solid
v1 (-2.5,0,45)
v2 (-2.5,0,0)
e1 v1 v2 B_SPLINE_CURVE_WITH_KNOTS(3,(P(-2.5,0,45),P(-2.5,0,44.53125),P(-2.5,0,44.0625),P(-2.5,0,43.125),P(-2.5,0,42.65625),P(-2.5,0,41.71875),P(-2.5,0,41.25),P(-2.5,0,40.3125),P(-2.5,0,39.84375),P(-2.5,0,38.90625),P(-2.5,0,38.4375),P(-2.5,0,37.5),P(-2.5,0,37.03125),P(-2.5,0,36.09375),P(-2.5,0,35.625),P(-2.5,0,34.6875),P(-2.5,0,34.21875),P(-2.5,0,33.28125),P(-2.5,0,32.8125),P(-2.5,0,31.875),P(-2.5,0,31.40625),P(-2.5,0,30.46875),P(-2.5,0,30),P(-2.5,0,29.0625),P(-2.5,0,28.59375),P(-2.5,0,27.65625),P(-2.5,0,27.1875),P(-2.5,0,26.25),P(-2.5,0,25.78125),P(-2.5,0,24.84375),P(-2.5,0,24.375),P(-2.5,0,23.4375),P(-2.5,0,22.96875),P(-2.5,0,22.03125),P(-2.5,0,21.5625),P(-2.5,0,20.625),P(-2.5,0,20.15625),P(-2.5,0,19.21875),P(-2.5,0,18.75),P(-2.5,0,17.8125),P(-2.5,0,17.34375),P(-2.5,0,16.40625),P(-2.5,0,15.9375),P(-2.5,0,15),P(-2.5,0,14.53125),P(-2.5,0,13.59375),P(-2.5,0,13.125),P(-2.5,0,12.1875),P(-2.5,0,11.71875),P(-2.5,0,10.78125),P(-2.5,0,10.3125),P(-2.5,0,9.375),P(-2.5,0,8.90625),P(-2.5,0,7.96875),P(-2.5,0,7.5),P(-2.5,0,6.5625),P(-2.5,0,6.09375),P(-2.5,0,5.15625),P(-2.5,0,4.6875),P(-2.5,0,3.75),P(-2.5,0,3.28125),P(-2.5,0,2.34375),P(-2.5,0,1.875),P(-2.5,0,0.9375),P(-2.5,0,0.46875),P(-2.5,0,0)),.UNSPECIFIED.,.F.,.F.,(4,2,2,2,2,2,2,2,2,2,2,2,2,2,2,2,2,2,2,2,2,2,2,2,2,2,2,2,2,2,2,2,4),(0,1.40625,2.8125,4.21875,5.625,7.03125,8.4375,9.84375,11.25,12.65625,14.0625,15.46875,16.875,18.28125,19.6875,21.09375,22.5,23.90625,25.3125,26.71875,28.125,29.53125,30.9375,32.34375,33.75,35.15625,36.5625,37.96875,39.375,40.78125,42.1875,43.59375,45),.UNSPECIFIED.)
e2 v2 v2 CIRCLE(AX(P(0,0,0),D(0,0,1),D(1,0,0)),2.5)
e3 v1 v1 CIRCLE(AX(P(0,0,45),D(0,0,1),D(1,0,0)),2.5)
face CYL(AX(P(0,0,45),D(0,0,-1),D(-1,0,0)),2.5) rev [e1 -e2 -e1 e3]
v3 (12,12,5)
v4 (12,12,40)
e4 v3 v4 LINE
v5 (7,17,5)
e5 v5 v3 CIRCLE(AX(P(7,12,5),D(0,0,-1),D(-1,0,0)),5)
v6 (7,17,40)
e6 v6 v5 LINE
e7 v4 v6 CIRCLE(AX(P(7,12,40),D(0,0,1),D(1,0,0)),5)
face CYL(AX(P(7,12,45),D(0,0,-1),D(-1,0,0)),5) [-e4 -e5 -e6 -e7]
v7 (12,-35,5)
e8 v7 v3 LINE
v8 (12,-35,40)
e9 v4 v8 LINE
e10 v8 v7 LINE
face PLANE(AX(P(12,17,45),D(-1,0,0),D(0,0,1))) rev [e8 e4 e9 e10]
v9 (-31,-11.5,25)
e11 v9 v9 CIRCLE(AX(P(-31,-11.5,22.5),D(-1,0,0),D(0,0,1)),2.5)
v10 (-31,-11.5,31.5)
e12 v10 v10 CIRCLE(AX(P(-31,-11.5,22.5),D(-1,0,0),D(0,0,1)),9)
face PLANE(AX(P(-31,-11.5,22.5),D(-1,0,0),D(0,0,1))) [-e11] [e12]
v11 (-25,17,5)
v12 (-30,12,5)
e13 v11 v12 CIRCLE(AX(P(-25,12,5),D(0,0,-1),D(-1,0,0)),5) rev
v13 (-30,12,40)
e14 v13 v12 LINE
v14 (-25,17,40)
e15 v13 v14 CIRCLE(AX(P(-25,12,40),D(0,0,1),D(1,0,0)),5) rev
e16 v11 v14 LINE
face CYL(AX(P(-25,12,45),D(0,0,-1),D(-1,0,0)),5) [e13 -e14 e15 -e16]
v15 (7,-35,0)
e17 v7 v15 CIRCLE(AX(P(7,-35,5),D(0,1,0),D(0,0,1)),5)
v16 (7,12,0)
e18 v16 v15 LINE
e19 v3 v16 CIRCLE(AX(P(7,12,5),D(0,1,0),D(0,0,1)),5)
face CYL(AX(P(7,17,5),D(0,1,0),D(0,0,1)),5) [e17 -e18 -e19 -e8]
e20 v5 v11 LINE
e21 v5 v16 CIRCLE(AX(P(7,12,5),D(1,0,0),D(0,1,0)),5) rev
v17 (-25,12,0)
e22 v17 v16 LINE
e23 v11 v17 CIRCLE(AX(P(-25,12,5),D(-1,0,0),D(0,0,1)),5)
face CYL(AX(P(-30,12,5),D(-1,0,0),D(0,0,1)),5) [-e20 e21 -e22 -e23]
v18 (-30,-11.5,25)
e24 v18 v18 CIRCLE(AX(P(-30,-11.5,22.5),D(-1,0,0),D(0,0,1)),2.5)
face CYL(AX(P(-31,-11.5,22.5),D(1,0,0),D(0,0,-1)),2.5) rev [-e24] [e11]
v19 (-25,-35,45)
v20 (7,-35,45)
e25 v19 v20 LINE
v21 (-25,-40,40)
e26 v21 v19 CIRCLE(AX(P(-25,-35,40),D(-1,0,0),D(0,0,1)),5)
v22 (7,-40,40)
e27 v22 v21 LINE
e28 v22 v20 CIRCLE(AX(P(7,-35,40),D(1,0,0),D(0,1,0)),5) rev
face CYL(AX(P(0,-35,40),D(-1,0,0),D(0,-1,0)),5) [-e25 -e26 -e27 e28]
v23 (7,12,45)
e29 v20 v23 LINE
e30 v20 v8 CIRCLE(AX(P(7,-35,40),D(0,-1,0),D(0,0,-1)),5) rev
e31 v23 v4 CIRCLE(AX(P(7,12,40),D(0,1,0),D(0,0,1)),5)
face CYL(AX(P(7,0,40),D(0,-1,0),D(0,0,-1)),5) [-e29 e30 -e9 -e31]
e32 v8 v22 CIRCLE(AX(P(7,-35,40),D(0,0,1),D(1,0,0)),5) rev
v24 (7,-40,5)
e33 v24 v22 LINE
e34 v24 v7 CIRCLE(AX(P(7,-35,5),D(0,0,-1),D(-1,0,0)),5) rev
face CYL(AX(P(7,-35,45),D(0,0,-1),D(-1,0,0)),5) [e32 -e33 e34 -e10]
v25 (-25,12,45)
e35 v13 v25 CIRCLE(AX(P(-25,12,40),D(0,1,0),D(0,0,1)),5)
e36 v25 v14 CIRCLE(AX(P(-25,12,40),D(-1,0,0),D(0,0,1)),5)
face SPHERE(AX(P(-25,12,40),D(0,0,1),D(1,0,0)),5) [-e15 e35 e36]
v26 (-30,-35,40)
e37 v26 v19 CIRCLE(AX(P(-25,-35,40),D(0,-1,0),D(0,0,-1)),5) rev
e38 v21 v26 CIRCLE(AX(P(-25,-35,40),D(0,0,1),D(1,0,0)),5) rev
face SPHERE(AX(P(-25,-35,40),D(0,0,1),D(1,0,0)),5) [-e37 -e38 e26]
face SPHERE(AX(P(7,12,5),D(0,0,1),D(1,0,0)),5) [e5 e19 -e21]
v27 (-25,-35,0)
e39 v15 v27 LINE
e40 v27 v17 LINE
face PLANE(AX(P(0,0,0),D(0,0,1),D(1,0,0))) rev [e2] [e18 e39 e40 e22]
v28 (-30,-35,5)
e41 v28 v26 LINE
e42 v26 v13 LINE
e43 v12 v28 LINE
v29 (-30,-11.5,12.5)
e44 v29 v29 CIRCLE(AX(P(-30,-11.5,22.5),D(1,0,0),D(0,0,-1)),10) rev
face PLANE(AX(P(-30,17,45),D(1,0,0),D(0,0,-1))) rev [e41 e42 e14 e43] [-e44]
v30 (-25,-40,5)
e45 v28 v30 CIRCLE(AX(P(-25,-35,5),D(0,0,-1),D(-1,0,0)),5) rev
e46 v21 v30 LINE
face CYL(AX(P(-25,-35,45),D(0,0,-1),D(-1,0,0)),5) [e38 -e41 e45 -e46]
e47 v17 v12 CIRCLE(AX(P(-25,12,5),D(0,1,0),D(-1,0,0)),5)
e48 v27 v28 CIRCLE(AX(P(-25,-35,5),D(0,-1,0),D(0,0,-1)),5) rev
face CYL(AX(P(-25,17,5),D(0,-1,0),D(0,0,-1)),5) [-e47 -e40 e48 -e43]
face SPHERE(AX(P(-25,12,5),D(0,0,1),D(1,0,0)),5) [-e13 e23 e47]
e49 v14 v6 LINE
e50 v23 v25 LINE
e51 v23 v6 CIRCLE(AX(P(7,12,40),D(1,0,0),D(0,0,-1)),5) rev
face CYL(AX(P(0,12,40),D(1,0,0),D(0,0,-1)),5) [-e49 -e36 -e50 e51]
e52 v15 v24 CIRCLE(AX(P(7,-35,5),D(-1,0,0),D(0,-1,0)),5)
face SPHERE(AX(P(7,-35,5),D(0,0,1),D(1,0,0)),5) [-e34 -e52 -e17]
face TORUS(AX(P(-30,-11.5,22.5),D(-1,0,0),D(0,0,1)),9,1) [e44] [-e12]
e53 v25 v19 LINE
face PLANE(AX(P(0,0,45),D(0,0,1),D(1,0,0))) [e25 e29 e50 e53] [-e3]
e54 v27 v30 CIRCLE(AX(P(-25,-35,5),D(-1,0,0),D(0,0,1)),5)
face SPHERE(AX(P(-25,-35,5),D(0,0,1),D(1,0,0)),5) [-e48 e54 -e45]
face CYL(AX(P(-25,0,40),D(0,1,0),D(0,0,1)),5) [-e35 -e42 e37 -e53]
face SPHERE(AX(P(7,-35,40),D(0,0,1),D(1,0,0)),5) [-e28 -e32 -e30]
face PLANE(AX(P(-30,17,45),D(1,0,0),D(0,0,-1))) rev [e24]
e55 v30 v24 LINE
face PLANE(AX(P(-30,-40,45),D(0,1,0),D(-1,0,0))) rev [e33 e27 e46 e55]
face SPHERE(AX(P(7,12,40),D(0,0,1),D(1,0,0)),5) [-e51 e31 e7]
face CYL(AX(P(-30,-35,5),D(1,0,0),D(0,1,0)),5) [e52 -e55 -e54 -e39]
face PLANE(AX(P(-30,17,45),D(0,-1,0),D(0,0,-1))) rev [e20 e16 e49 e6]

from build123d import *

# Parameters (mm, degrees)
SKETCH1_W           = 42
SKETCH1_H           = 57
SKETCH1_R           = 2.5
BOSS_EXTRUDE1_DEPTH = 45
FILLET1_R           = 5
FILLET2_R           = 5
SKETCH2_R           = 10
SKETCH2_R_2         = 2.5
BOSS_EXTRUDE2_DEPTH = 1
FILLET3_R           = 1


# Some blends are built 0.0001 mm under size
with BuildPart() as part:
    # Sketch1 → Boss-Extrude1 (new body)
    with BuildSketch(Plane.XY):
        with Locations((-9, -11.5)):
            Rectangle(SKETCH1_W, SKETCH1_H)
        with Locations(Location((0, 0, 0), (0, 0, 180))):
            Circle(SKETCH1_R, mode=Mode.SUBTRACT)
    extrude(amount=BOSS_EXTRUDE1_DEPTH)

    # Fillet1
    fillet1_edges = [part.edges().sort_by_distance(p)[0] for p in [
        (12, -11.5, 45),
        (-9, 17, 45),
        (-30, -11.5, 45),
        (-9, 17, 0),
        (12, -11.5, 0),
        (-30, -11.5, 0),
        (-30, 17, 22.5),
        (12, 17, 22.5),
        (12, -40, 22.5),
        (-30, -40, 22.5),
        (-9, -40, 45),
    ]]
    fillet(fillet1_edges, radius=FILLET1_R)

    # Fillet2
    # the kernel refuses this fillet: 5 mm, written as the material it takes off along each edge
    with BuildSketch(Plane(origin=(7, -35, 5), x_dir=(0, -1, 0), z_dir=(0, 0, -1))) as fillet2_piece_1_section:
        Polygon((0, 0), (FILLET2_R, 0), (FILLET2_R, -FILLET2_R), (0, -FILLET2_R), align=None)
    fillet2_piece_1 = extrude(amount=FILLET2_R, mode=Mode.PRIVATE)
    fillet2_piece_1 = fillet2_piece_1 - Plane(origin=(7, -35, 5), x_dir=(-0.7071067811865477, 0.7071067811865474, 0), z_dir=(0, 0, -1)) * Sphere(FILLET2_R, mode=Mode.PRIVATE)
    add(fillet2_piece_1, mode=Mode.SUBTRACT)
    with BuildSketch(Plane(origin=(-25, -35, 5), x_dir=(0, -1, 0), z_dir=(0, 0, -1))) as fillet2_piece_2_section:
        Polygon((0, 0), (FILLET2_R, 0), (FILLET2_R, FILLET2_R), (0, FILLET2_R), align=None)
    fillet2_piece_2 = extrude(amount=FILLET2_R, mode=Mode.PRIVATE)
    fillet2_piece_2 = fillet2_piece_2 - Plane(origin=(-25, -35, 5), x_dir=(0.7071067811865474, 0.7071067811865476, 0), z_dir=(0, 0, -1)) * Sphere(FILLET2_R, mode=Mode.PRIVATE)
    add(fillet2_piece_2, mode=Mode.SUBTRACT)
    with BuildSketch(Plane(origin=(7, -40, 0), x_dir=(0, 1, 0), z_dir=(-1, 0, 0))) as fillet2_piece_3:
        with BuildLine():
            CenterArc((FILLET2_R, -FILLET2_R), FILLET2_R, 90, 90)
            Line((0, -FILLET2_R), (0, 0))
            Line((0, 0), (FILLET2_R, 0))
        make_face()
    extrude(amount=32, mode=Mode.SUBTRACT)

    # Sketch2 → Boss-Extrude2 (add)
    with BuildSketch(Plane.ZY.offset(30)):
        with Locations(Location((22.5, -11.5, 0), (0, 0, 180))):
            Circle(SKETCH2_R)
        with Locations((22.5, -11.5)):
            Circle(SKETCH2_R_2, mode=Mode.SUBTRACT)
    extrude(amount=BOSS_EXTRUDE2_DEPTH)

    # Fillet3
    fillet3_edges = [part.edges().sort_by_distance(p)[0] for p in [
        (-31, -11.5, 32.5),
    ]]
    fillet(fillet3_edges, radius=FILLET3_R - 0.0001)  # a hair under: the kernel refuses the full size


solid = part.part
